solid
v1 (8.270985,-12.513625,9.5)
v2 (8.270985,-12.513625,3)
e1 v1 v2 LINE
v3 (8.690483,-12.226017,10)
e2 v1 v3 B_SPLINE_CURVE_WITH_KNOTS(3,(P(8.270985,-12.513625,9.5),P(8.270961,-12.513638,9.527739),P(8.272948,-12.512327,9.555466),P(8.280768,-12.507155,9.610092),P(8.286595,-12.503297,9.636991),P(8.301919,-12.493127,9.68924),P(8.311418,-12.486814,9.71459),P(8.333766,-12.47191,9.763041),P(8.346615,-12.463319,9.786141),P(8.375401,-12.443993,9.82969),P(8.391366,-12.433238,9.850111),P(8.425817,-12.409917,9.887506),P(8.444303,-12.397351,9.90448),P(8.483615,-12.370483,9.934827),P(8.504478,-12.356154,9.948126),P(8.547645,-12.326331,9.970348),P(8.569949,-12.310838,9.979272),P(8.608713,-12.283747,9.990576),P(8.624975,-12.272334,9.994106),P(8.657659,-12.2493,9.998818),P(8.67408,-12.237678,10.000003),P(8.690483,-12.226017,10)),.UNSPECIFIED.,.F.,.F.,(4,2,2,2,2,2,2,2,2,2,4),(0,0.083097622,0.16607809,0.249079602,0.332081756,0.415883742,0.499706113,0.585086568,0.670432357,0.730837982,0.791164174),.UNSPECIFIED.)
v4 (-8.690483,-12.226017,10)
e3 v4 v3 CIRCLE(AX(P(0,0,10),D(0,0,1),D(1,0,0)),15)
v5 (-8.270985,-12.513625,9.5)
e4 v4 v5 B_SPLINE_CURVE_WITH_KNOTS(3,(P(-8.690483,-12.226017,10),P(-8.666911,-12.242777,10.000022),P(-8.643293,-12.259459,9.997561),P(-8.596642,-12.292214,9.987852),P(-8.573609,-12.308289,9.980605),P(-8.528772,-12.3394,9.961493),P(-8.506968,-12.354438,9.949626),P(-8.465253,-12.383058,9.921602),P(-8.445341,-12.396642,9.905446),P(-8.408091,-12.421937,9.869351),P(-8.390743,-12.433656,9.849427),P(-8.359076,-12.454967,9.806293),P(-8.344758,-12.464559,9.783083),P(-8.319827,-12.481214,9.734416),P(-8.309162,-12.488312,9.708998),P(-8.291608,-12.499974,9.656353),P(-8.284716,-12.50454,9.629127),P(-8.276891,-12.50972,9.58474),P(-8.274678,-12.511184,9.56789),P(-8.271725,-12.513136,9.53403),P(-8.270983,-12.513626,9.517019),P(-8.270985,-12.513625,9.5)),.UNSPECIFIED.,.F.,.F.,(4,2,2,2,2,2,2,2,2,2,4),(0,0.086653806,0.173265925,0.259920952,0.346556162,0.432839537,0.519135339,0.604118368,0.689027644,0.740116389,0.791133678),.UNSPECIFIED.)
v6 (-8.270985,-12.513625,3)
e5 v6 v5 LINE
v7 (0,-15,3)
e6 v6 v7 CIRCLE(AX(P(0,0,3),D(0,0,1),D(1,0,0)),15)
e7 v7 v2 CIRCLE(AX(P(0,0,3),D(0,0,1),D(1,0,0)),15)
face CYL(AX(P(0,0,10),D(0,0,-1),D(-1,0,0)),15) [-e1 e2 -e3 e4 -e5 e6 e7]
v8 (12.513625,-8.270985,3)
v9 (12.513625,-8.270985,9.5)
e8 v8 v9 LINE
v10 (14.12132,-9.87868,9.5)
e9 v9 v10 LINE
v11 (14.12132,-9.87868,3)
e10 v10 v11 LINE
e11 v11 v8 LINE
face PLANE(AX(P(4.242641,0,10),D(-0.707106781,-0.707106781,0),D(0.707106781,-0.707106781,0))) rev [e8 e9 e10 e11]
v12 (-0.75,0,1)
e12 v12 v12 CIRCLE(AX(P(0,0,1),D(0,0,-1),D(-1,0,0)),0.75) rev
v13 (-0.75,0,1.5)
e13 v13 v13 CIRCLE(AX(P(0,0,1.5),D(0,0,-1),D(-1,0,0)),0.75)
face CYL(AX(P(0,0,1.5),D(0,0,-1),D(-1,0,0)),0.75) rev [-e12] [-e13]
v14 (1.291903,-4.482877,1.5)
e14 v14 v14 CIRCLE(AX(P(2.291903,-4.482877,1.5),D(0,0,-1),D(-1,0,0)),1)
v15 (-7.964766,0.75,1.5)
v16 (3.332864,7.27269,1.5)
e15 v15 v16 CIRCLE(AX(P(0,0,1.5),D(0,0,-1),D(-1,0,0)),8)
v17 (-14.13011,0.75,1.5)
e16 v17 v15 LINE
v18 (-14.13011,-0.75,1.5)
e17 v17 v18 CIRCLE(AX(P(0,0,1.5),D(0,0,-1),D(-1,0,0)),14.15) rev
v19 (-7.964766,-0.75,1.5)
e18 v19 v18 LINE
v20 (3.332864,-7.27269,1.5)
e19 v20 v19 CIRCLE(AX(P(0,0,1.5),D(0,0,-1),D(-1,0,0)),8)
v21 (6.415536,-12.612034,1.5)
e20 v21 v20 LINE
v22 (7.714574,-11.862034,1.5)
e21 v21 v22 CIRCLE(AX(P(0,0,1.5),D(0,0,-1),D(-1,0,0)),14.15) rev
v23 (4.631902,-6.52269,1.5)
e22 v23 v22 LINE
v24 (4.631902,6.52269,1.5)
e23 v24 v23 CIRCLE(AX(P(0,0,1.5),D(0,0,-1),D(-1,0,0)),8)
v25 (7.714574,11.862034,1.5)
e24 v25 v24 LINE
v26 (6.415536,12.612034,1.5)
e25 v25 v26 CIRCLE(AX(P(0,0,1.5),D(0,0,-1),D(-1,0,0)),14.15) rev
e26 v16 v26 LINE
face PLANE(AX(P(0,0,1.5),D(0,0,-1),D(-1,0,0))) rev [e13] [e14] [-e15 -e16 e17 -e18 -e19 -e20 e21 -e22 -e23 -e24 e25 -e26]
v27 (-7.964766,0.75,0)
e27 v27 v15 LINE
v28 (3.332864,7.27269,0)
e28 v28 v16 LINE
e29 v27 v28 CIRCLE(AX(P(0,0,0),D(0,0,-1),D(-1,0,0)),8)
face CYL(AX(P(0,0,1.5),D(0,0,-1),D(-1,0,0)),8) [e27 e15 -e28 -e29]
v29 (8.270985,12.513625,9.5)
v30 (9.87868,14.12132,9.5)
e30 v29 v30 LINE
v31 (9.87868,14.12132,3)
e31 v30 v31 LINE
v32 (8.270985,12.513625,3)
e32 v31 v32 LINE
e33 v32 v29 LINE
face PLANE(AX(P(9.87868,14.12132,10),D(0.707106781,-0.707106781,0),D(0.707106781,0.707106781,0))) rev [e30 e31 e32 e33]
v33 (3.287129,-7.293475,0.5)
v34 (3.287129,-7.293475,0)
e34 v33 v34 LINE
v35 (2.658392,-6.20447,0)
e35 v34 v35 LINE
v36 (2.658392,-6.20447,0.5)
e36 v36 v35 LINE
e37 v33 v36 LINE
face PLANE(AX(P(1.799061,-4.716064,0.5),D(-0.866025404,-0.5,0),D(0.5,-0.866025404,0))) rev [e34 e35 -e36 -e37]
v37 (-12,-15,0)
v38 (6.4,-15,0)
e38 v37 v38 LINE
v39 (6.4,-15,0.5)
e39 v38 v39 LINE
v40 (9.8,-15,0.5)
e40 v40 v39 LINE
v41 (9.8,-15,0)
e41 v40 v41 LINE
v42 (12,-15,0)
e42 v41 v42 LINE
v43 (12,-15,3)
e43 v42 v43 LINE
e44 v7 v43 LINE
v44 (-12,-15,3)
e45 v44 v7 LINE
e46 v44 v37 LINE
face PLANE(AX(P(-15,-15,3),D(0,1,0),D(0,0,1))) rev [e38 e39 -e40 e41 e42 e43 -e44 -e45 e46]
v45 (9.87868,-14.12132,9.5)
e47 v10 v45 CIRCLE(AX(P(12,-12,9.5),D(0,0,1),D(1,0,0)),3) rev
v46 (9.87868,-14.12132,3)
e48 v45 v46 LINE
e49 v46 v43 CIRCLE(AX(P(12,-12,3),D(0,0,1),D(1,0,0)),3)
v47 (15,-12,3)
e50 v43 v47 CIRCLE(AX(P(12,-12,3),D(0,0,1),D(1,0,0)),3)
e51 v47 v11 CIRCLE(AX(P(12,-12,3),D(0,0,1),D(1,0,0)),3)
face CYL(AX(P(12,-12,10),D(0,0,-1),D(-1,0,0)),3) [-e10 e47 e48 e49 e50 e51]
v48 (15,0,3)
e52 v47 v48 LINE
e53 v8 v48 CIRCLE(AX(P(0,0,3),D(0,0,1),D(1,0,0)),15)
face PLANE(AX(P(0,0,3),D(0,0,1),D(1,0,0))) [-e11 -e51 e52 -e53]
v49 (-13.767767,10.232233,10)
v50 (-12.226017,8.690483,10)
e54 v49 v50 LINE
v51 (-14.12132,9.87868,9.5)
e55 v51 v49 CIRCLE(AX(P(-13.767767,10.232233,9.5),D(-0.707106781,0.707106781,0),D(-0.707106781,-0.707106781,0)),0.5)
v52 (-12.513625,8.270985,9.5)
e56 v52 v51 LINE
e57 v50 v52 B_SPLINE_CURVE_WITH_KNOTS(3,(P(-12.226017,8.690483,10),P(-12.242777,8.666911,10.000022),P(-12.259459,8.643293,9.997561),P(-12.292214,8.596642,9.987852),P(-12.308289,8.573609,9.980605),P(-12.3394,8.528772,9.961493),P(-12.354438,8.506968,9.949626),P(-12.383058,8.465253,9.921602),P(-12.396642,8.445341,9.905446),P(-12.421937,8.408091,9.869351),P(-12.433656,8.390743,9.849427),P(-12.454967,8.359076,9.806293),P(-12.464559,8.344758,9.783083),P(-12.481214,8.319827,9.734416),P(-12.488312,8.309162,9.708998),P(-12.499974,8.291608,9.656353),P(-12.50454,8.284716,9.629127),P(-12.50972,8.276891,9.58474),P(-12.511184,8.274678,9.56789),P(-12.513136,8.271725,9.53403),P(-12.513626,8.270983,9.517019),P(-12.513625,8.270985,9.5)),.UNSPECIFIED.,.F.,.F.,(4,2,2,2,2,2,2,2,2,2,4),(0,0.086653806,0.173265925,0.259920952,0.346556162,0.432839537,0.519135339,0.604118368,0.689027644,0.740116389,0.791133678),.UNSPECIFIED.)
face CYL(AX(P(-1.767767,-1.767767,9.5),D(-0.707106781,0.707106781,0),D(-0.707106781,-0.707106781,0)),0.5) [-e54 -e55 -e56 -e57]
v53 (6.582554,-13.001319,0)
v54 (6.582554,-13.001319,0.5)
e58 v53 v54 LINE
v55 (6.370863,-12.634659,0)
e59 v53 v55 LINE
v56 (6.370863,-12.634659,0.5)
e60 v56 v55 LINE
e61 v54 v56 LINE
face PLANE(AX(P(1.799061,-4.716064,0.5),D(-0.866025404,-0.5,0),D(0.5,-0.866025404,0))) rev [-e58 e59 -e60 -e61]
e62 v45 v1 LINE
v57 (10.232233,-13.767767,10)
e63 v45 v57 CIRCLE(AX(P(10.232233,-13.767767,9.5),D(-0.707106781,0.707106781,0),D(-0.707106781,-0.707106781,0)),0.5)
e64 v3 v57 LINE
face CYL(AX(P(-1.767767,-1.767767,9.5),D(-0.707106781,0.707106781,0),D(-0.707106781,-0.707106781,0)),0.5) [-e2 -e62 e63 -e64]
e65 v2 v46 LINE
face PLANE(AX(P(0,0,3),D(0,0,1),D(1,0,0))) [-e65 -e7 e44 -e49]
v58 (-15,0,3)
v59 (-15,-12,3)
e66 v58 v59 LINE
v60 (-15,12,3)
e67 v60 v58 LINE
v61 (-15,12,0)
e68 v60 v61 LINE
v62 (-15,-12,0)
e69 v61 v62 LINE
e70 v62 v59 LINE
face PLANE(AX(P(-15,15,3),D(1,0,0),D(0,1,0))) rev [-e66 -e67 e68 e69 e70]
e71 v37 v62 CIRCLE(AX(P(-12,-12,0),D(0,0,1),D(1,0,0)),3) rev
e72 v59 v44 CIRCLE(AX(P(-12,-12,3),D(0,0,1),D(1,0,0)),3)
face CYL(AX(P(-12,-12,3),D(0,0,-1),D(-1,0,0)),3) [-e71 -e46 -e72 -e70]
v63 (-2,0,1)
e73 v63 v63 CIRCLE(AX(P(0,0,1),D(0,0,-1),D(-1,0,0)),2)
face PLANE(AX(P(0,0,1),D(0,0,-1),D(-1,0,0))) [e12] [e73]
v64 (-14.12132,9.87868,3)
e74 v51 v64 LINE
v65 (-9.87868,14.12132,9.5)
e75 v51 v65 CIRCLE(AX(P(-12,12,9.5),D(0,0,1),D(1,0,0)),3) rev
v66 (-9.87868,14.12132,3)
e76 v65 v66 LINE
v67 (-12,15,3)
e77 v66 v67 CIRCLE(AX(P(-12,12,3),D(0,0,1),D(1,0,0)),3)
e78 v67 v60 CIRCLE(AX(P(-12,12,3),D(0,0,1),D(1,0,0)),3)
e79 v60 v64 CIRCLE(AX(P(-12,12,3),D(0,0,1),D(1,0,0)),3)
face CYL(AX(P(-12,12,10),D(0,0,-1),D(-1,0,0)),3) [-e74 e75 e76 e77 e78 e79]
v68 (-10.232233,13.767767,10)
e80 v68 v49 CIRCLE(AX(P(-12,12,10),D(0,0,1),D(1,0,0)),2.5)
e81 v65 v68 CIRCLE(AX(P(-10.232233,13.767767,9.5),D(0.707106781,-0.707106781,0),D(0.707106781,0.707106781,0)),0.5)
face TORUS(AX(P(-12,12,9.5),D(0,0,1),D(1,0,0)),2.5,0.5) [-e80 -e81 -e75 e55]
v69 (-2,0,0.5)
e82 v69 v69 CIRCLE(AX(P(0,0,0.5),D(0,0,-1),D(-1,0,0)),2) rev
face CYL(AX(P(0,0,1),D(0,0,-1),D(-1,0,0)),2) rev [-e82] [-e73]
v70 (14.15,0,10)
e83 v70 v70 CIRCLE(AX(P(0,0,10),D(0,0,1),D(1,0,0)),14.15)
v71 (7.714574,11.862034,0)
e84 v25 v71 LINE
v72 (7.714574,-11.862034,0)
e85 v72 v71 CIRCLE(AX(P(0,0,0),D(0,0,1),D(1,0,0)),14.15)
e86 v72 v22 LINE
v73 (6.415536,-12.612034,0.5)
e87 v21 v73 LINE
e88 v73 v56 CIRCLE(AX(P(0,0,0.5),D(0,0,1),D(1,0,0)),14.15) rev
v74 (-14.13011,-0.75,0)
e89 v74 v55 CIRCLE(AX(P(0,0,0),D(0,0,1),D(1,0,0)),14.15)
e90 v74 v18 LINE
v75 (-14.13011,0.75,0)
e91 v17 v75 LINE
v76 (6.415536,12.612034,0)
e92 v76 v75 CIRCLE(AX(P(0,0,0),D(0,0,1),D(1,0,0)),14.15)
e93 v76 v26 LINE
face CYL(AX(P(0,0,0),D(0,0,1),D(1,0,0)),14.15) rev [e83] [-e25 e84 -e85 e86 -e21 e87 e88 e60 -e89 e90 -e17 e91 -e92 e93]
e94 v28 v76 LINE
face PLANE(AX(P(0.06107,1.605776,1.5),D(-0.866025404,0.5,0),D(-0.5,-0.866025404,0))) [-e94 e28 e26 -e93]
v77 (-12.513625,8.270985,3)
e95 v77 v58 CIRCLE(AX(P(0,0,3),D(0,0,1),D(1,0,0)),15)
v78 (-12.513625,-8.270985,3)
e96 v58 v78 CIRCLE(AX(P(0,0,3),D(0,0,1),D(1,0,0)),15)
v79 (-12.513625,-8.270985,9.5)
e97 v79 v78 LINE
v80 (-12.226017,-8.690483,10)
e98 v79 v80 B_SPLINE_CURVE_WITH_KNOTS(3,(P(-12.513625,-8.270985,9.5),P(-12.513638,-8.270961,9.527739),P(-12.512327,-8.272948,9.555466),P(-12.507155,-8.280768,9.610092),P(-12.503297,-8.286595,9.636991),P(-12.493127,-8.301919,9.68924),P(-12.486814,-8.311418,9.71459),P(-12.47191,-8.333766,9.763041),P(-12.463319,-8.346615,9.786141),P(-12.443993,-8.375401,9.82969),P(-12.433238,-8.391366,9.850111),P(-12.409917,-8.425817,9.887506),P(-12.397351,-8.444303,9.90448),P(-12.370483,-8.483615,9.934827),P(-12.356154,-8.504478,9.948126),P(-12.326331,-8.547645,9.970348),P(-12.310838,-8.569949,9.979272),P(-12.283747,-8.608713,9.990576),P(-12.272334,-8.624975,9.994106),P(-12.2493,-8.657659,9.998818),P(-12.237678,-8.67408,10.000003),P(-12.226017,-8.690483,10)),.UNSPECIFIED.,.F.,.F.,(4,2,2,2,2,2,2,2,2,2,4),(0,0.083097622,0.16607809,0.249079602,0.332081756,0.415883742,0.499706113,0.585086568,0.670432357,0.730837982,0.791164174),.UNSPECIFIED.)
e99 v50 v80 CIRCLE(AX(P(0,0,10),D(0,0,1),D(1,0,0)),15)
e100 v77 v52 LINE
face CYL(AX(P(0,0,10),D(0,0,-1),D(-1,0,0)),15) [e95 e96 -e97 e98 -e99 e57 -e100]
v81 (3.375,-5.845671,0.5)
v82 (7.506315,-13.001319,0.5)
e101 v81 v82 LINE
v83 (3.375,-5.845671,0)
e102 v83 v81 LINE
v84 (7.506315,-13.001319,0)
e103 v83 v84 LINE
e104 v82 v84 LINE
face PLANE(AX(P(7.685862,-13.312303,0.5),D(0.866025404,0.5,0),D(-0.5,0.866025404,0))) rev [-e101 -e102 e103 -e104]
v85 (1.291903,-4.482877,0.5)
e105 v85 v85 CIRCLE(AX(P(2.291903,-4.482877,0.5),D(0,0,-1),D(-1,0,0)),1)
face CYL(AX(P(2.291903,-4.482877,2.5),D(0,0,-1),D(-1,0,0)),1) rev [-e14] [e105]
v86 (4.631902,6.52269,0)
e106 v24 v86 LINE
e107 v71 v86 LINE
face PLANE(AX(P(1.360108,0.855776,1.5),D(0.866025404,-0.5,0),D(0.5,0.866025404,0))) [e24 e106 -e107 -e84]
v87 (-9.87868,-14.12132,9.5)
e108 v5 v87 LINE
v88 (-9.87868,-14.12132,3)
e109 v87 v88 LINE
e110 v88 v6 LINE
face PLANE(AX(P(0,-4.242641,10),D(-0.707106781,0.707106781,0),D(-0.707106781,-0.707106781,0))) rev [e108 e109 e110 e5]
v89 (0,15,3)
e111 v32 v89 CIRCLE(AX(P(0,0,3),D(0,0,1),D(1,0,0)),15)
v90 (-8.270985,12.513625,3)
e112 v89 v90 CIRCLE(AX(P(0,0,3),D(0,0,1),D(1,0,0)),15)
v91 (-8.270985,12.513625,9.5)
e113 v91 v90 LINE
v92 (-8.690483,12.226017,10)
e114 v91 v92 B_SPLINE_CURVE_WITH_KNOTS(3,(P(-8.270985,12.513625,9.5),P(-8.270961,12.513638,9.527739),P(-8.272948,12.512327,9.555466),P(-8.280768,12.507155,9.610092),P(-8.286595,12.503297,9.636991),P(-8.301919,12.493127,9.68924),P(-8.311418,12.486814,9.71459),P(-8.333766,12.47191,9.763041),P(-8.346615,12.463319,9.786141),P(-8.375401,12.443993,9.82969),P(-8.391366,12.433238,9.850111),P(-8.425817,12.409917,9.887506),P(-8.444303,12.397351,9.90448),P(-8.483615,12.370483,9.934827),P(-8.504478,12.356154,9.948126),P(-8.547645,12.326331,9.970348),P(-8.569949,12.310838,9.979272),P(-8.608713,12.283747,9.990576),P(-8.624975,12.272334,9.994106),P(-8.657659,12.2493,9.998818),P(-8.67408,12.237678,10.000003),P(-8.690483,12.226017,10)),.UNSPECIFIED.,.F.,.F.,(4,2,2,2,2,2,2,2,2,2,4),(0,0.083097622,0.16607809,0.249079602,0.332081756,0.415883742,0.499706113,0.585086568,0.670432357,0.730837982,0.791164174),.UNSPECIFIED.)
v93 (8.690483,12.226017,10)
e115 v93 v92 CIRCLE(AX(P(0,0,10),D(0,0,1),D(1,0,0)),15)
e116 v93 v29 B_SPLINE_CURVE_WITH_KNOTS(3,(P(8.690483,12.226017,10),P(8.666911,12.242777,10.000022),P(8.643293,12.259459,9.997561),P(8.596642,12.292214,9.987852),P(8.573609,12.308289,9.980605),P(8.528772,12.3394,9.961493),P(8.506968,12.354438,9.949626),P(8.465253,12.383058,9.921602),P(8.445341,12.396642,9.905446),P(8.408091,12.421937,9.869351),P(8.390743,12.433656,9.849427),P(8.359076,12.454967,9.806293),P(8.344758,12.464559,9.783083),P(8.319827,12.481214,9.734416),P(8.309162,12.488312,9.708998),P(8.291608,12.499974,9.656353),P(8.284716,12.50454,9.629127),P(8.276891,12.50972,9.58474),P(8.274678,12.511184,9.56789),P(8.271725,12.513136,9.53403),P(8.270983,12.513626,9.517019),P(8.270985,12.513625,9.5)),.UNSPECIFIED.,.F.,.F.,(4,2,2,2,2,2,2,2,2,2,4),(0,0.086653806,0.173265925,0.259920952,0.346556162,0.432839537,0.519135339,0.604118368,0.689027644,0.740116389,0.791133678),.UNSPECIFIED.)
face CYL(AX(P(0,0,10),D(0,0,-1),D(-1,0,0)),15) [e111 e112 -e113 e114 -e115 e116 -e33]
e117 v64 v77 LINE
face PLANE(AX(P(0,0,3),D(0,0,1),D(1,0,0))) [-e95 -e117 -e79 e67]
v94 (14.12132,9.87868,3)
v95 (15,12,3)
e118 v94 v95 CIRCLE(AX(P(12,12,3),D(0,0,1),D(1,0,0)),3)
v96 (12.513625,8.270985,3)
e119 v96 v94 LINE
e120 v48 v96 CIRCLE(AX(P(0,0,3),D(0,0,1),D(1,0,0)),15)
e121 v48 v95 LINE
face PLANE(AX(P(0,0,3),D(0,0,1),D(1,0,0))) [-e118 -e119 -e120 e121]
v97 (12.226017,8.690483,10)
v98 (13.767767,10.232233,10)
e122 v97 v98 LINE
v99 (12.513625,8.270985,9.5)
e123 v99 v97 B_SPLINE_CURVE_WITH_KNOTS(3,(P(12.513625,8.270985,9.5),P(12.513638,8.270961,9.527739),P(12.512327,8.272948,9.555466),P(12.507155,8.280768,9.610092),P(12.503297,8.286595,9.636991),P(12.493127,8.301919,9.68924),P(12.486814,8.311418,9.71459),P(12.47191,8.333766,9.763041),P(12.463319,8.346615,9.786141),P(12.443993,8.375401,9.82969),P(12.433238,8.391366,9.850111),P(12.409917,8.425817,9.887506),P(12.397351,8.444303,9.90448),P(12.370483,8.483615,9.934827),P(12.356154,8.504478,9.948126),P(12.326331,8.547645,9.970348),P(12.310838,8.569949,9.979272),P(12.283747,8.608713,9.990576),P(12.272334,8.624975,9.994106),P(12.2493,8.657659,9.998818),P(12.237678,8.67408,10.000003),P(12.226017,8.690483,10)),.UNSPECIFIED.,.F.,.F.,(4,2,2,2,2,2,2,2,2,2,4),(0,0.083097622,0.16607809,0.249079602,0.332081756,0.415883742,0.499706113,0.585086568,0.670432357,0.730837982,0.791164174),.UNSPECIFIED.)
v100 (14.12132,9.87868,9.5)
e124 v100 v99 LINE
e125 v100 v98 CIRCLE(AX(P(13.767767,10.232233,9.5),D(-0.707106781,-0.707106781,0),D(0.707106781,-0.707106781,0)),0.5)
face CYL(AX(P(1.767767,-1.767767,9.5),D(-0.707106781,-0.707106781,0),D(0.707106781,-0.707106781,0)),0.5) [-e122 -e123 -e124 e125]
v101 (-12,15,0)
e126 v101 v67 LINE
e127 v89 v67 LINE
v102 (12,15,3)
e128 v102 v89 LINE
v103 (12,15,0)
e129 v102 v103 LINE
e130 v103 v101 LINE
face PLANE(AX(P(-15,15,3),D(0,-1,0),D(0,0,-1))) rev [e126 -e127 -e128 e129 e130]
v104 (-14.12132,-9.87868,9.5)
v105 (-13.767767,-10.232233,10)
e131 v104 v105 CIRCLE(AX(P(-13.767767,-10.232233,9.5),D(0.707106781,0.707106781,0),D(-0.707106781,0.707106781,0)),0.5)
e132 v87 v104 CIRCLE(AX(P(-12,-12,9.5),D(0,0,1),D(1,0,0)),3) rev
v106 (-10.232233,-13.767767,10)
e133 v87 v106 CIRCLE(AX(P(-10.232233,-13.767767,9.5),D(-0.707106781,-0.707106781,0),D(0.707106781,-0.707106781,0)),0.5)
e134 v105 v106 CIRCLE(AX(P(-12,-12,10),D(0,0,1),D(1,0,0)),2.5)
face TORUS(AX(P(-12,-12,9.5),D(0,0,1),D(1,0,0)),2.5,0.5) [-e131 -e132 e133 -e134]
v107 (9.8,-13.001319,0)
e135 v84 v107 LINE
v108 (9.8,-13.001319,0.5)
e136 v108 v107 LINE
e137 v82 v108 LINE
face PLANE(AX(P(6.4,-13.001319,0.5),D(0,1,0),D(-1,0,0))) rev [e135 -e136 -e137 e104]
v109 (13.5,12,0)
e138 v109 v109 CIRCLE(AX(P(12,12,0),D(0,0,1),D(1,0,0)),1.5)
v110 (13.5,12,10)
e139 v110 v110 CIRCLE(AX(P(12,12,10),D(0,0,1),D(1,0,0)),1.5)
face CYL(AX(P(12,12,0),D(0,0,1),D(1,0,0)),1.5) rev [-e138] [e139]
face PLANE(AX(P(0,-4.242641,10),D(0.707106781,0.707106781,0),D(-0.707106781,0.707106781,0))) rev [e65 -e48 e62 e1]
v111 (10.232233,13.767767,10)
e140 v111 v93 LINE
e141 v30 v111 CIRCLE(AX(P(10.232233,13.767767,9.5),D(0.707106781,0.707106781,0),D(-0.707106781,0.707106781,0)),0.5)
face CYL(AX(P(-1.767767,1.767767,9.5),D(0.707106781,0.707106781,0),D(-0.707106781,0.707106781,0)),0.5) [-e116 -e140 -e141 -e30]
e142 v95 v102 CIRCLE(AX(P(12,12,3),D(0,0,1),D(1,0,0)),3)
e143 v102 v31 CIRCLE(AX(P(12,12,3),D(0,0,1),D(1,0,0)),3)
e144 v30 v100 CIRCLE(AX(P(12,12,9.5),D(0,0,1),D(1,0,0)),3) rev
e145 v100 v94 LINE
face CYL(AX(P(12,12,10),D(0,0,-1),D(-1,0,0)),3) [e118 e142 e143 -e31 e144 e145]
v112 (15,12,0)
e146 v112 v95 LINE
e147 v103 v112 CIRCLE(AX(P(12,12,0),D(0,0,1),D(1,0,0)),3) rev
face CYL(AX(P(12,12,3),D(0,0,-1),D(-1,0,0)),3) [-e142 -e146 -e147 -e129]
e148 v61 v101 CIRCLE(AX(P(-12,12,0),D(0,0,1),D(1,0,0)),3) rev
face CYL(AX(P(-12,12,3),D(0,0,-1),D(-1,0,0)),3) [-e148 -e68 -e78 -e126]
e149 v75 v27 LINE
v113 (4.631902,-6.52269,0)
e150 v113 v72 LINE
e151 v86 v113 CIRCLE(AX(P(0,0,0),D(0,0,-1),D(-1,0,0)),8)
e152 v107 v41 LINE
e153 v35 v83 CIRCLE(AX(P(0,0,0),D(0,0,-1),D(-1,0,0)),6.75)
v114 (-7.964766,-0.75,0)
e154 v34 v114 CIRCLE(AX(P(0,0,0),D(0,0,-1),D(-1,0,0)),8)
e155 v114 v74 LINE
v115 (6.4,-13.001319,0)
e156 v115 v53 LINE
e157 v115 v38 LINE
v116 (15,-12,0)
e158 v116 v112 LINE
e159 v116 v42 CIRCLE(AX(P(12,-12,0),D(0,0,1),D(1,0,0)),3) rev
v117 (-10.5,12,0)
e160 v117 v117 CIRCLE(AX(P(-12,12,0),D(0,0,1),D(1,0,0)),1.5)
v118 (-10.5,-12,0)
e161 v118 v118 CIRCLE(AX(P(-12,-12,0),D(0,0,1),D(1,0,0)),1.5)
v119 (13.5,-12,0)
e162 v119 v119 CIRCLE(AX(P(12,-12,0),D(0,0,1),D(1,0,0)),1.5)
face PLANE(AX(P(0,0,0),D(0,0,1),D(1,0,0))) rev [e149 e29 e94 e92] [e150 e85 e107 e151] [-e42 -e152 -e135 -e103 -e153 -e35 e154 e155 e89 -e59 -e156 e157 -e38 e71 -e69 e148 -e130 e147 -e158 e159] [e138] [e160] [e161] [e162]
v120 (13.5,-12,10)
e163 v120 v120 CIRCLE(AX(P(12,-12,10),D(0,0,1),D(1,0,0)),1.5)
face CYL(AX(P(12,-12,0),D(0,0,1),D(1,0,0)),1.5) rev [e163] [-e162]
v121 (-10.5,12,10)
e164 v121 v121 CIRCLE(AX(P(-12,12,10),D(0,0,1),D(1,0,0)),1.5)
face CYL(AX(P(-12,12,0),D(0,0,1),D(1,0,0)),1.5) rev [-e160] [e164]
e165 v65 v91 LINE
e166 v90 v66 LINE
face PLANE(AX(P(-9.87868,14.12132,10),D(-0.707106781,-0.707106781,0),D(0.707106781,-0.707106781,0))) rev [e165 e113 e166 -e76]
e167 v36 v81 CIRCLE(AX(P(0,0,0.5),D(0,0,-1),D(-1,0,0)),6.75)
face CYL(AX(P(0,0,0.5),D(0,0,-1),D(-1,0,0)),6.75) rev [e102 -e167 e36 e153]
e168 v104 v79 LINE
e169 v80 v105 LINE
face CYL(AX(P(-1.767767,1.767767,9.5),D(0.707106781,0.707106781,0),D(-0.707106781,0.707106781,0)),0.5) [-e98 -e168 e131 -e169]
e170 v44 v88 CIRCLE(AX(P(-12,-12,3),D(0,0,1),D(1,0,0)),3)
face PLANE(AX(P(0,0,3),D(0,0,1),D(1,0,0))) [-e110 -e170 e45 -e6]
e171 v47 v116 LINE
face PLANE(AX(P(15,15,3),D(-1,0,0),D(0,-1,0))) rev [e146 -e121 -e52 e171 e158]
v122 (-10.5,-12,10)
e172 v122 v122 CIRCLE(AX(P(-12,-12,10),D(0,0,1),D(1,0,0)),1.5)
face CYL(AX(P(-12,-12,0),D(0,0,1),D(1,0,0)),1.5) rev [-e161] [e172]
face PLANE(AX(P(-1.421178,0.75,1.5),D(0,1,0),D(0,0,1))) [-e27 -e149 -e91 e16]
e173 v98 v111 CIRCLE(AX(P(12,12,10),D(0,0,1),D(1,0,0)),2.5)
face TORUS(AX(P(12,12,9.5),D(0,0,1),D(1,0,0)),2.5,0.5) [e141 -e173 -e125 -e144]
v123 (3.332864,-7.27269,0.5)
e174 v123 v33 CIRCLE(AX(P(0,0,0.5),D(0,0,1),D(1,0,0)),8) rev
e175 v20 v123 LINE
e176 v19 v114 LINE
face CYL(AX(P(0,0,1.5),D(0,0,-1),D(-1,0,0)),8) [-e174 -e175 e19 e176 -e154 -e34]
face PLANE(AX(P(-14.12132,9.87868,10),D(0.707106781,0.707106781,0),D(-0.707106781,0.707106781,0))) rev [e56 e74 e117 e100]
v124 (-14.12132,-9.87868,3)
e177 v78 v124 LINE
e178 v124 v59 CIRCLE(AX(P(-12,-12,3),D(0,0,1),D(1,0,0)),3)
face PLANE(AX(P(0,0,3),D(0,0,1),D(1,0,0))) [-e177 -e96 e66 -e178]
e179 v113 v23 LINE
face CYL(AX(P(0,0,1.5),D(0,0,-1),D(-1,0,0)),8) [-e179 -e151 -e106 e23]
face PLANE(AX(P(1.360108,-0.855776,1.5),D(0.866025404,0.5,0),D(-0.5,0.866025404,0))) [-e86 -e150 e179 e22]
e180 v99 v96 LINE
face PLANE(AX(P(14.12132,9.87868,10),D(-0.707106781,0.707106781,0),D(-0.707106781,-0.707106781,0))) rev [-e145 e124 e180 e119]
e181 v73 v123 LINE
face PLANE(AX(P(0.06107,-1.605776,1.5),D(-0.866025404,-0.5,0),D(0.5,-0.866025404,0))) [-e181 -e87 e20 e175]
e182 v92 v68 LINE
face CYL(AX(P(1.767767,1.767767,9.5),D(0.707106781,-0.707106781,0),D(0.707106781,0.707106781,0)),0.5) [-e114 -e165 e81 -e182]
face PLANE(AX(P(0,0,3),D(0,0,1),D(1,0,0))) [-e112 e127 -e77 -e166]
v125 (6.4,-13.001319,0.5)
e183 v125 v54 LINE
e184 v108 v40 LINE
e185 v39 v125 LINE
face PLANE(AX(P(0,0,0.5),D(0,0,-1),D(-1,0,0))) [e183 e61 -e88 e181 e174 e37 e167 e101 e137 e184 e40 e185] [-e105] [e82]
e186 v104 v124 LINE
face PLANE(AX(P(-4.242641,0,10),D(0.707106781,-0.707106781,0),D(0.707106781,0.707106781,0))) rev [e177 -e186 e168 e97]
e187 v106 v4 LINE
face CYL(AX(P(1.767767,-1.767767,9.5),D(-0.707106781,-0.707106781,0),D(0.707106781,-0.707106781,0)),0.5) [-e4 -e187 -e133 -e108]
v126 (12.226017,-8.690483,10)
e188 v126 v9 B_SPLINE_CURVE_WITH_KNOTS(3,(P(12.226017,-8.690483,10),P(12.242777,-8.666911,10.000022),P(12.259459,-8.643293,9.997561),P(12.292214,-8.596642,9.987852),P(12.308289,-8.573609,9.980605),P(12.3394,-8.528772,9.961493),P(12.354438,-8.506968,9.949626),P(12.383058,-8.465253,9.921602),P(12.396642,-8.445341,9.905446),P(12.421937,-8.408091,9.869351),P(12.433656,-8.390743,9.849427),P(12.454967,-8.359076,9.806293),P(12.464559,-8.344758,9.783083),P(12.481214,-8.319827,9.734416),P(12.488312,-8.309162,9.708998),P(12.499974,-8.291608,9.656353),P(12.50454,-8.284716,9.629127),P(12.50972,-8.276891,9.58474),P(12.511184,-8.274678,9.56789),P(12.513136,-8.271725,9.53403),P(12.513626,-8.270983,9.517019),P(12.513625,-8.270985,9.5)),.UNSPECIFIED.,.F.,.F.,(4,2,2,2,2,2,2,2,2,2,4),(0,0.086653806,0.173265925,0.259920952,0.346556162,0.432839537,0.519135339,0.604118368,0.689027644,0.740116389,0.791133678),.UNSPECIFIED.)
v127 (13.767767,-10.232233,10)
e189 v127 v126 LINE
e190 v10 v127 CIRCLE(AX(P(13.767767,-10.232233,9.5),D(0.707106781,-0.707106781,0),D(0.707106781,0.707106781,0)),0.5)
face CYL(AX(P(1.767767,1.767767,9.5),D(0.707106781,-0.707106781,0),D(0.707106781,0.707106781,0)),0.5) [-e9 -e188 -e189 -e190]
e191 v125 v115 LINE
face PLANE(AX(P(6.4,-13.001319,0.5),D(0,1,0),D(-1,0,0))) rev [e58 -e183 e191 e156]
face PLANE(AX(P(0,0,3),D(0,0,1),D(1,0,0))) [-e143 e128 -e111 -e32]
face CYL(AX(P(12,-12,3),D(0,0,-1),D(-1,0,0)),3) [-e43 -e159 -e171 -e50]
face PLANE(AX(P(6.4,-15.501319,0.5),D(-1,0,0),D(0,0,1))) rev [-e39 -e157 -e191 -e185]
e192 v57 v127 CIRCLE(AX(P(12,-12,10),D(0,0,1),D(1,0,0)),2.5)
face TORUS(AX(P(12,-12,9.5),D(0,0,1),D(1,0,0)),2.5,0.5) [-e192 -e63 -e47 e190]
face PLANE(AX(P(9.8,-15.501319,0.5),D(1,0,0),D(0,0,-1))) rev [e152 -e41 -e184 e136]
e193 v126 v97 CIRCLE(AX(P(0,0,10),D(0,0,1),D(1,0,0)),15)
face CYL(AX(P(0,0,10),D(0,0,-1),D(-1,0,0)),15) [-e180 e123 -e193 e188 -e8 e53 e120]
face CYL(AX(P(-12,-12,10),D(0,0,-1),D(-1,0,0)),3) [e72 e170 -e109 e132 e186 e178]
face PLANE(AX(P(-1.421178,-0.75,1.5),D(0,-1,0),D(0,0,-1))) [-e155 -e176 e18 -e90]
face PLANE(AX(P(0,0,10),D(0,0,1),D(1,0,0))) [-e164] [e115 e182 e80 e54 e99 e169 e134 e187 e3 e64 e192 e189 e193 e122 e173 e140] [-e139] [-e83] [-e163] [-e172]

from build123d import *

# Parameters (mm, degrees)
SKETCH1_W           = 30
SKETCH1_H           = 30
BOSS_EXTRUDE1_DEPTH = 3
SKETCH2_R           = 15
BOSS_EXTRUDE2_DEPTH = 7
BOSS_EXTRUDE3_DEPTH = 7
FILLET1_R           = 3
SKETCH5_R           = 14.15
CUT_EXTRUDE2_DEPTH  = 10
SKETCH6_R           = 1.5
CUT_EXTRUDE3_DEPTH  = 10
SKETCH7_R           = 8
BOSS_EXTRUDE4_DEPTH = 1.5
SKETCH8_W           = 13.15764426
SKETCH8_H           = 1.5
BOSS_EXTRUDE5_DEPTH = 1.5
SKETCH9_R           = 0.75
CUT_EXTRUDE4_DEPTH  = 1.5
SKETCH10_R          = 2
CUT_EXTRUDE5_DEPTH  = 1
SKETCH11_R          = 6.75
CUT_EXTRUDE6_DEPTH  = 0.5
SKETCH12_W          = 3.4
SKETCH12_H          = 2.5
CUT_EXTRUDE7_DEPTH  = 0.5
CUT_EXTRUDE8_DEPTH  = 0.5
SKETCH14_R          = 1
CUT_EXTRUDE9_DEPTH  = 2
FILLET2_R           = 0.5


with BuildPart() as part:
    # Sketch1 → Boss-Extrude1 (new body)
    with BuildSketch(Plane.XY):
        Rectangle(SKETCH1_W, SKETCH1_H)
    extrude(amount=BOSS_EXTRUDE1_DEPTH)

    # Sketch2 → Boss-Extrude2 (add)
    with BuildSketch(Plane.XY.offset(3)):
        Circle(SKETCH2_R)
    extrude(amount=BOSS_EXTRUDE2_DEPTH)

    # Sketch4 → Boss-Extrude3 (add)
    with BuildSketch(Plane.XY.offset(3)):
        with BuildLine():
            Line((-14.121320344, 9.878679656), (-4.242640687, 0))
            Line((-4.242640687, 0), (-14.121320344, -9.878679656))
            ThreePointArc((-14.121320344, -9.878679656), (-14.121320344, -14.121320344), (-9.878679656, -14.121320344))
            Line((-9.878679656, -14.121320344), (0, -4.242640687))
            Line((0, -4.242640687), (9.878679656, -14.121320344))
            ThreePointArc((9.878679656, -14.121320344), (14.121320344, -14.121320344), (14.121320344, -9.878679656))
            Line((14.121320344, -9.878679656), (4.242640687, 0))
            Line((4.242640687, 0), (14.121320344, 9.878679656))
            ThreePointArc((14.121320344, 9.878679656), (14.121320344, 14.121320344), (9.878679656, 14.121320344))
            Line((9.878679656, 14.121320344), (0, 4.242640687))
            Line((0, 4.242640687), (-9.878679656, 14.121320344))
            ThreePointArc((-9.878679656, 14.121320344), (-14.121320344, 14.121320344), (-14.121320344, 9.878679656))
        make_face()
    extrude(amount=BOSS_EXTRUDE3_DEPTH)

    # Fillet1
    fillet1_edges = [part.edges().sort_by_distance(p)[0] for p in [
        (-15, -15, 1.5),
        (15, -15, 1.5),
        (15, 15, 1.5),
        (-15, 15, 1.5),
    ]]
    fillet(fillet1_edges, radius=FILLET1_R - 0.0001)  # a hair under: the kernel refuses the full size

    # Sketch5 → Cut-Extrude2 (cut)
    with BuildSketch(Plane.XY.offset(10)):
        Circle(SKETCH5_R)
    extrude(amount=-CUT_EXTRUDE2_DEPTH, mode=Mode.SUBTRACT)

    # Sketch6 → Cut-Extrude3 (cut)
    with BuildSketch(Plane.XY.offset(10)):
        with Locations((-12, 12)):
            Circle(SKETCH6_R)
        with Locations((12, 12)):
            Circle(SKETCH6_R)
        with Locations((12, -12)):
            Circle(SKETCH6_R)
        with Locations((-12, -12)):
            Circle(SKETCH6_R)
    extrude(amount=-CUT_EXTRUDE3_DEPTH, mode=Mode.SUBTRACT)



with BuildPart() as body_2:
    # Sketch7 → Boss-Extrude4 (new body)
    with BuildSketch(Plane(origin=(0, 0, 0), x_dir=(-1, 0, 0), z_dir=(0, 0, -1))):
        Circle(SKETCH7_R)
    extrude(amount=-BOSS_EXTRUDE4_DEPTH)


with BuildPart() as part_1:
    add(part.part)

    add(body_2.part)  # Boss-Extrude5 merges body 2
    # Sketch8 → Boss-Extrude5 (add)
    with BuildSketch(Plane(origin=(0, 0, 0), x_dir=(-1, 0, 0), z_dir=(0, 0, -1))):
        Polygon((-0.061069882, -1.605776139), (-6.639892012, -13.000630322), (-7.938930118, -12.250630322), (-1.360107988, -0.855776139), align=None)
        with Locations((8, 0)):
            Rectangle(SKETCH8_W, SKETCH8_H)
        Polygon((-1.360107988, 0.855776139), (-7.938930118, 12.250630322), (-6.639892012, 13.000630322), (-0.061069882, 1.605776139), align=None)
    extrude(amount=-BOSS_EXTRUDE5_DEPTH)

    # Sketch9 → Cut-Extrude4 (cut)
    with BuildSketch(Plane(origin=(0, 0, 0), x_dir=(-1, 0, 0), z_dir=(0, 0, -1))):
        Circle(SKETCH9_R)
    extrude(amount=-CUT_EXTRUDE4_DEPTH, mode=Mode.SUBTRACT)

    # Sketch10 → Cut-Extrude5 (cut)
    with BuildSketch(Plane(origin=(0, 0, 0), x_dir=(-1, 0, 0), z_dir=(0, 0, -1))):
        Circle(SKETCH10_R)
    extrude(amount=-CUT_EXTRUDE5_DEPTH, mode=Mode.SUBTRACT)

    # Sketch11 → Cut-Extrude6 (cut)
    with BuildSketch(Plane(origin=(0, 0, 0), x_dir=(-1, 0, 0), z_dir=(0, 0, -1))):
        Circle(SKETCH11_R)
    extrude(amount=-CUT_EXTRUDE6_DEPTH, mode=Mode.SUBTRACT)

    # Sketch12 → Cut-Extrude7 (cut)
    with BuildSketch(Plane(origin=(0, 0, 0), x_dir=(-1, 0, 0), z_dir=(0, 0, -1))):
        with Locations((-8.1, -14.251318629)):
            Rectangle(SKETCH12_W, SKETCH12_H)
    extrude(amount=-CUT_EXTRUDE7_DEPTH, mode=Mode.SUBTRACT)

    # Sketch13 → Cut-Extrude8 (cut)
    with BuildSketch(Plane(origin=(0, 0, 0), x_dir=(-1, 0, 0), z_dir=(0, 0, -1))):
        Polygon((-1.799060557, -4.71606429), (-6.993041412, -13.712303025), (-7.685861735, -13.312303025), (-2.49188088, -4.31606429), align=None)
    extrude(amount=-CUT_EXTRUDE8_DEPTH, mode=Mode.SUBTRACT)

    # Sketch14 → Cut-Extrude9 (cut)
    with BuildSketch(Plane(origin=(0, 0, 0.5), x_dir=(-1, 0, 0), z_dir=(0, 0, -1))):
        with Locations((-2.291903498, -4.48287736)):
            Circle(SKETCH14_R)
    extrude(amount=-CUT_EXTRUDE9_DEPTH, mode=Mode.SUBTRACT)

    # Fillet2
    fillet2_edges = [part_1.edges().sort_by_distance(p)[0] for p in [
        (13.317472766, 9.074832079, 10),
        (14.121320344, 14.121320344, 10),
        (9.074832079, 13.317472766, 10),
        (-9.074832079, 13.317472766, 10),
        (-14.121320344, 14.121320344, 10),
        (-13.317472766, 9.074832079, 10),
        (-13.317472766, -9.074832079, 10),
        (-14.121320344, -14.121320344, 10),
        (-9.074832079, -13.317472766, 10),
        (9.074832079, -13.317472766, 10),
        (14.121320344, -14.121320344, 10),
        (13.317472766, -9.074832079, 10),
    ]]
    fillet(fillet2_edges, radius=FILLET2_R)


solid = part_1.part
